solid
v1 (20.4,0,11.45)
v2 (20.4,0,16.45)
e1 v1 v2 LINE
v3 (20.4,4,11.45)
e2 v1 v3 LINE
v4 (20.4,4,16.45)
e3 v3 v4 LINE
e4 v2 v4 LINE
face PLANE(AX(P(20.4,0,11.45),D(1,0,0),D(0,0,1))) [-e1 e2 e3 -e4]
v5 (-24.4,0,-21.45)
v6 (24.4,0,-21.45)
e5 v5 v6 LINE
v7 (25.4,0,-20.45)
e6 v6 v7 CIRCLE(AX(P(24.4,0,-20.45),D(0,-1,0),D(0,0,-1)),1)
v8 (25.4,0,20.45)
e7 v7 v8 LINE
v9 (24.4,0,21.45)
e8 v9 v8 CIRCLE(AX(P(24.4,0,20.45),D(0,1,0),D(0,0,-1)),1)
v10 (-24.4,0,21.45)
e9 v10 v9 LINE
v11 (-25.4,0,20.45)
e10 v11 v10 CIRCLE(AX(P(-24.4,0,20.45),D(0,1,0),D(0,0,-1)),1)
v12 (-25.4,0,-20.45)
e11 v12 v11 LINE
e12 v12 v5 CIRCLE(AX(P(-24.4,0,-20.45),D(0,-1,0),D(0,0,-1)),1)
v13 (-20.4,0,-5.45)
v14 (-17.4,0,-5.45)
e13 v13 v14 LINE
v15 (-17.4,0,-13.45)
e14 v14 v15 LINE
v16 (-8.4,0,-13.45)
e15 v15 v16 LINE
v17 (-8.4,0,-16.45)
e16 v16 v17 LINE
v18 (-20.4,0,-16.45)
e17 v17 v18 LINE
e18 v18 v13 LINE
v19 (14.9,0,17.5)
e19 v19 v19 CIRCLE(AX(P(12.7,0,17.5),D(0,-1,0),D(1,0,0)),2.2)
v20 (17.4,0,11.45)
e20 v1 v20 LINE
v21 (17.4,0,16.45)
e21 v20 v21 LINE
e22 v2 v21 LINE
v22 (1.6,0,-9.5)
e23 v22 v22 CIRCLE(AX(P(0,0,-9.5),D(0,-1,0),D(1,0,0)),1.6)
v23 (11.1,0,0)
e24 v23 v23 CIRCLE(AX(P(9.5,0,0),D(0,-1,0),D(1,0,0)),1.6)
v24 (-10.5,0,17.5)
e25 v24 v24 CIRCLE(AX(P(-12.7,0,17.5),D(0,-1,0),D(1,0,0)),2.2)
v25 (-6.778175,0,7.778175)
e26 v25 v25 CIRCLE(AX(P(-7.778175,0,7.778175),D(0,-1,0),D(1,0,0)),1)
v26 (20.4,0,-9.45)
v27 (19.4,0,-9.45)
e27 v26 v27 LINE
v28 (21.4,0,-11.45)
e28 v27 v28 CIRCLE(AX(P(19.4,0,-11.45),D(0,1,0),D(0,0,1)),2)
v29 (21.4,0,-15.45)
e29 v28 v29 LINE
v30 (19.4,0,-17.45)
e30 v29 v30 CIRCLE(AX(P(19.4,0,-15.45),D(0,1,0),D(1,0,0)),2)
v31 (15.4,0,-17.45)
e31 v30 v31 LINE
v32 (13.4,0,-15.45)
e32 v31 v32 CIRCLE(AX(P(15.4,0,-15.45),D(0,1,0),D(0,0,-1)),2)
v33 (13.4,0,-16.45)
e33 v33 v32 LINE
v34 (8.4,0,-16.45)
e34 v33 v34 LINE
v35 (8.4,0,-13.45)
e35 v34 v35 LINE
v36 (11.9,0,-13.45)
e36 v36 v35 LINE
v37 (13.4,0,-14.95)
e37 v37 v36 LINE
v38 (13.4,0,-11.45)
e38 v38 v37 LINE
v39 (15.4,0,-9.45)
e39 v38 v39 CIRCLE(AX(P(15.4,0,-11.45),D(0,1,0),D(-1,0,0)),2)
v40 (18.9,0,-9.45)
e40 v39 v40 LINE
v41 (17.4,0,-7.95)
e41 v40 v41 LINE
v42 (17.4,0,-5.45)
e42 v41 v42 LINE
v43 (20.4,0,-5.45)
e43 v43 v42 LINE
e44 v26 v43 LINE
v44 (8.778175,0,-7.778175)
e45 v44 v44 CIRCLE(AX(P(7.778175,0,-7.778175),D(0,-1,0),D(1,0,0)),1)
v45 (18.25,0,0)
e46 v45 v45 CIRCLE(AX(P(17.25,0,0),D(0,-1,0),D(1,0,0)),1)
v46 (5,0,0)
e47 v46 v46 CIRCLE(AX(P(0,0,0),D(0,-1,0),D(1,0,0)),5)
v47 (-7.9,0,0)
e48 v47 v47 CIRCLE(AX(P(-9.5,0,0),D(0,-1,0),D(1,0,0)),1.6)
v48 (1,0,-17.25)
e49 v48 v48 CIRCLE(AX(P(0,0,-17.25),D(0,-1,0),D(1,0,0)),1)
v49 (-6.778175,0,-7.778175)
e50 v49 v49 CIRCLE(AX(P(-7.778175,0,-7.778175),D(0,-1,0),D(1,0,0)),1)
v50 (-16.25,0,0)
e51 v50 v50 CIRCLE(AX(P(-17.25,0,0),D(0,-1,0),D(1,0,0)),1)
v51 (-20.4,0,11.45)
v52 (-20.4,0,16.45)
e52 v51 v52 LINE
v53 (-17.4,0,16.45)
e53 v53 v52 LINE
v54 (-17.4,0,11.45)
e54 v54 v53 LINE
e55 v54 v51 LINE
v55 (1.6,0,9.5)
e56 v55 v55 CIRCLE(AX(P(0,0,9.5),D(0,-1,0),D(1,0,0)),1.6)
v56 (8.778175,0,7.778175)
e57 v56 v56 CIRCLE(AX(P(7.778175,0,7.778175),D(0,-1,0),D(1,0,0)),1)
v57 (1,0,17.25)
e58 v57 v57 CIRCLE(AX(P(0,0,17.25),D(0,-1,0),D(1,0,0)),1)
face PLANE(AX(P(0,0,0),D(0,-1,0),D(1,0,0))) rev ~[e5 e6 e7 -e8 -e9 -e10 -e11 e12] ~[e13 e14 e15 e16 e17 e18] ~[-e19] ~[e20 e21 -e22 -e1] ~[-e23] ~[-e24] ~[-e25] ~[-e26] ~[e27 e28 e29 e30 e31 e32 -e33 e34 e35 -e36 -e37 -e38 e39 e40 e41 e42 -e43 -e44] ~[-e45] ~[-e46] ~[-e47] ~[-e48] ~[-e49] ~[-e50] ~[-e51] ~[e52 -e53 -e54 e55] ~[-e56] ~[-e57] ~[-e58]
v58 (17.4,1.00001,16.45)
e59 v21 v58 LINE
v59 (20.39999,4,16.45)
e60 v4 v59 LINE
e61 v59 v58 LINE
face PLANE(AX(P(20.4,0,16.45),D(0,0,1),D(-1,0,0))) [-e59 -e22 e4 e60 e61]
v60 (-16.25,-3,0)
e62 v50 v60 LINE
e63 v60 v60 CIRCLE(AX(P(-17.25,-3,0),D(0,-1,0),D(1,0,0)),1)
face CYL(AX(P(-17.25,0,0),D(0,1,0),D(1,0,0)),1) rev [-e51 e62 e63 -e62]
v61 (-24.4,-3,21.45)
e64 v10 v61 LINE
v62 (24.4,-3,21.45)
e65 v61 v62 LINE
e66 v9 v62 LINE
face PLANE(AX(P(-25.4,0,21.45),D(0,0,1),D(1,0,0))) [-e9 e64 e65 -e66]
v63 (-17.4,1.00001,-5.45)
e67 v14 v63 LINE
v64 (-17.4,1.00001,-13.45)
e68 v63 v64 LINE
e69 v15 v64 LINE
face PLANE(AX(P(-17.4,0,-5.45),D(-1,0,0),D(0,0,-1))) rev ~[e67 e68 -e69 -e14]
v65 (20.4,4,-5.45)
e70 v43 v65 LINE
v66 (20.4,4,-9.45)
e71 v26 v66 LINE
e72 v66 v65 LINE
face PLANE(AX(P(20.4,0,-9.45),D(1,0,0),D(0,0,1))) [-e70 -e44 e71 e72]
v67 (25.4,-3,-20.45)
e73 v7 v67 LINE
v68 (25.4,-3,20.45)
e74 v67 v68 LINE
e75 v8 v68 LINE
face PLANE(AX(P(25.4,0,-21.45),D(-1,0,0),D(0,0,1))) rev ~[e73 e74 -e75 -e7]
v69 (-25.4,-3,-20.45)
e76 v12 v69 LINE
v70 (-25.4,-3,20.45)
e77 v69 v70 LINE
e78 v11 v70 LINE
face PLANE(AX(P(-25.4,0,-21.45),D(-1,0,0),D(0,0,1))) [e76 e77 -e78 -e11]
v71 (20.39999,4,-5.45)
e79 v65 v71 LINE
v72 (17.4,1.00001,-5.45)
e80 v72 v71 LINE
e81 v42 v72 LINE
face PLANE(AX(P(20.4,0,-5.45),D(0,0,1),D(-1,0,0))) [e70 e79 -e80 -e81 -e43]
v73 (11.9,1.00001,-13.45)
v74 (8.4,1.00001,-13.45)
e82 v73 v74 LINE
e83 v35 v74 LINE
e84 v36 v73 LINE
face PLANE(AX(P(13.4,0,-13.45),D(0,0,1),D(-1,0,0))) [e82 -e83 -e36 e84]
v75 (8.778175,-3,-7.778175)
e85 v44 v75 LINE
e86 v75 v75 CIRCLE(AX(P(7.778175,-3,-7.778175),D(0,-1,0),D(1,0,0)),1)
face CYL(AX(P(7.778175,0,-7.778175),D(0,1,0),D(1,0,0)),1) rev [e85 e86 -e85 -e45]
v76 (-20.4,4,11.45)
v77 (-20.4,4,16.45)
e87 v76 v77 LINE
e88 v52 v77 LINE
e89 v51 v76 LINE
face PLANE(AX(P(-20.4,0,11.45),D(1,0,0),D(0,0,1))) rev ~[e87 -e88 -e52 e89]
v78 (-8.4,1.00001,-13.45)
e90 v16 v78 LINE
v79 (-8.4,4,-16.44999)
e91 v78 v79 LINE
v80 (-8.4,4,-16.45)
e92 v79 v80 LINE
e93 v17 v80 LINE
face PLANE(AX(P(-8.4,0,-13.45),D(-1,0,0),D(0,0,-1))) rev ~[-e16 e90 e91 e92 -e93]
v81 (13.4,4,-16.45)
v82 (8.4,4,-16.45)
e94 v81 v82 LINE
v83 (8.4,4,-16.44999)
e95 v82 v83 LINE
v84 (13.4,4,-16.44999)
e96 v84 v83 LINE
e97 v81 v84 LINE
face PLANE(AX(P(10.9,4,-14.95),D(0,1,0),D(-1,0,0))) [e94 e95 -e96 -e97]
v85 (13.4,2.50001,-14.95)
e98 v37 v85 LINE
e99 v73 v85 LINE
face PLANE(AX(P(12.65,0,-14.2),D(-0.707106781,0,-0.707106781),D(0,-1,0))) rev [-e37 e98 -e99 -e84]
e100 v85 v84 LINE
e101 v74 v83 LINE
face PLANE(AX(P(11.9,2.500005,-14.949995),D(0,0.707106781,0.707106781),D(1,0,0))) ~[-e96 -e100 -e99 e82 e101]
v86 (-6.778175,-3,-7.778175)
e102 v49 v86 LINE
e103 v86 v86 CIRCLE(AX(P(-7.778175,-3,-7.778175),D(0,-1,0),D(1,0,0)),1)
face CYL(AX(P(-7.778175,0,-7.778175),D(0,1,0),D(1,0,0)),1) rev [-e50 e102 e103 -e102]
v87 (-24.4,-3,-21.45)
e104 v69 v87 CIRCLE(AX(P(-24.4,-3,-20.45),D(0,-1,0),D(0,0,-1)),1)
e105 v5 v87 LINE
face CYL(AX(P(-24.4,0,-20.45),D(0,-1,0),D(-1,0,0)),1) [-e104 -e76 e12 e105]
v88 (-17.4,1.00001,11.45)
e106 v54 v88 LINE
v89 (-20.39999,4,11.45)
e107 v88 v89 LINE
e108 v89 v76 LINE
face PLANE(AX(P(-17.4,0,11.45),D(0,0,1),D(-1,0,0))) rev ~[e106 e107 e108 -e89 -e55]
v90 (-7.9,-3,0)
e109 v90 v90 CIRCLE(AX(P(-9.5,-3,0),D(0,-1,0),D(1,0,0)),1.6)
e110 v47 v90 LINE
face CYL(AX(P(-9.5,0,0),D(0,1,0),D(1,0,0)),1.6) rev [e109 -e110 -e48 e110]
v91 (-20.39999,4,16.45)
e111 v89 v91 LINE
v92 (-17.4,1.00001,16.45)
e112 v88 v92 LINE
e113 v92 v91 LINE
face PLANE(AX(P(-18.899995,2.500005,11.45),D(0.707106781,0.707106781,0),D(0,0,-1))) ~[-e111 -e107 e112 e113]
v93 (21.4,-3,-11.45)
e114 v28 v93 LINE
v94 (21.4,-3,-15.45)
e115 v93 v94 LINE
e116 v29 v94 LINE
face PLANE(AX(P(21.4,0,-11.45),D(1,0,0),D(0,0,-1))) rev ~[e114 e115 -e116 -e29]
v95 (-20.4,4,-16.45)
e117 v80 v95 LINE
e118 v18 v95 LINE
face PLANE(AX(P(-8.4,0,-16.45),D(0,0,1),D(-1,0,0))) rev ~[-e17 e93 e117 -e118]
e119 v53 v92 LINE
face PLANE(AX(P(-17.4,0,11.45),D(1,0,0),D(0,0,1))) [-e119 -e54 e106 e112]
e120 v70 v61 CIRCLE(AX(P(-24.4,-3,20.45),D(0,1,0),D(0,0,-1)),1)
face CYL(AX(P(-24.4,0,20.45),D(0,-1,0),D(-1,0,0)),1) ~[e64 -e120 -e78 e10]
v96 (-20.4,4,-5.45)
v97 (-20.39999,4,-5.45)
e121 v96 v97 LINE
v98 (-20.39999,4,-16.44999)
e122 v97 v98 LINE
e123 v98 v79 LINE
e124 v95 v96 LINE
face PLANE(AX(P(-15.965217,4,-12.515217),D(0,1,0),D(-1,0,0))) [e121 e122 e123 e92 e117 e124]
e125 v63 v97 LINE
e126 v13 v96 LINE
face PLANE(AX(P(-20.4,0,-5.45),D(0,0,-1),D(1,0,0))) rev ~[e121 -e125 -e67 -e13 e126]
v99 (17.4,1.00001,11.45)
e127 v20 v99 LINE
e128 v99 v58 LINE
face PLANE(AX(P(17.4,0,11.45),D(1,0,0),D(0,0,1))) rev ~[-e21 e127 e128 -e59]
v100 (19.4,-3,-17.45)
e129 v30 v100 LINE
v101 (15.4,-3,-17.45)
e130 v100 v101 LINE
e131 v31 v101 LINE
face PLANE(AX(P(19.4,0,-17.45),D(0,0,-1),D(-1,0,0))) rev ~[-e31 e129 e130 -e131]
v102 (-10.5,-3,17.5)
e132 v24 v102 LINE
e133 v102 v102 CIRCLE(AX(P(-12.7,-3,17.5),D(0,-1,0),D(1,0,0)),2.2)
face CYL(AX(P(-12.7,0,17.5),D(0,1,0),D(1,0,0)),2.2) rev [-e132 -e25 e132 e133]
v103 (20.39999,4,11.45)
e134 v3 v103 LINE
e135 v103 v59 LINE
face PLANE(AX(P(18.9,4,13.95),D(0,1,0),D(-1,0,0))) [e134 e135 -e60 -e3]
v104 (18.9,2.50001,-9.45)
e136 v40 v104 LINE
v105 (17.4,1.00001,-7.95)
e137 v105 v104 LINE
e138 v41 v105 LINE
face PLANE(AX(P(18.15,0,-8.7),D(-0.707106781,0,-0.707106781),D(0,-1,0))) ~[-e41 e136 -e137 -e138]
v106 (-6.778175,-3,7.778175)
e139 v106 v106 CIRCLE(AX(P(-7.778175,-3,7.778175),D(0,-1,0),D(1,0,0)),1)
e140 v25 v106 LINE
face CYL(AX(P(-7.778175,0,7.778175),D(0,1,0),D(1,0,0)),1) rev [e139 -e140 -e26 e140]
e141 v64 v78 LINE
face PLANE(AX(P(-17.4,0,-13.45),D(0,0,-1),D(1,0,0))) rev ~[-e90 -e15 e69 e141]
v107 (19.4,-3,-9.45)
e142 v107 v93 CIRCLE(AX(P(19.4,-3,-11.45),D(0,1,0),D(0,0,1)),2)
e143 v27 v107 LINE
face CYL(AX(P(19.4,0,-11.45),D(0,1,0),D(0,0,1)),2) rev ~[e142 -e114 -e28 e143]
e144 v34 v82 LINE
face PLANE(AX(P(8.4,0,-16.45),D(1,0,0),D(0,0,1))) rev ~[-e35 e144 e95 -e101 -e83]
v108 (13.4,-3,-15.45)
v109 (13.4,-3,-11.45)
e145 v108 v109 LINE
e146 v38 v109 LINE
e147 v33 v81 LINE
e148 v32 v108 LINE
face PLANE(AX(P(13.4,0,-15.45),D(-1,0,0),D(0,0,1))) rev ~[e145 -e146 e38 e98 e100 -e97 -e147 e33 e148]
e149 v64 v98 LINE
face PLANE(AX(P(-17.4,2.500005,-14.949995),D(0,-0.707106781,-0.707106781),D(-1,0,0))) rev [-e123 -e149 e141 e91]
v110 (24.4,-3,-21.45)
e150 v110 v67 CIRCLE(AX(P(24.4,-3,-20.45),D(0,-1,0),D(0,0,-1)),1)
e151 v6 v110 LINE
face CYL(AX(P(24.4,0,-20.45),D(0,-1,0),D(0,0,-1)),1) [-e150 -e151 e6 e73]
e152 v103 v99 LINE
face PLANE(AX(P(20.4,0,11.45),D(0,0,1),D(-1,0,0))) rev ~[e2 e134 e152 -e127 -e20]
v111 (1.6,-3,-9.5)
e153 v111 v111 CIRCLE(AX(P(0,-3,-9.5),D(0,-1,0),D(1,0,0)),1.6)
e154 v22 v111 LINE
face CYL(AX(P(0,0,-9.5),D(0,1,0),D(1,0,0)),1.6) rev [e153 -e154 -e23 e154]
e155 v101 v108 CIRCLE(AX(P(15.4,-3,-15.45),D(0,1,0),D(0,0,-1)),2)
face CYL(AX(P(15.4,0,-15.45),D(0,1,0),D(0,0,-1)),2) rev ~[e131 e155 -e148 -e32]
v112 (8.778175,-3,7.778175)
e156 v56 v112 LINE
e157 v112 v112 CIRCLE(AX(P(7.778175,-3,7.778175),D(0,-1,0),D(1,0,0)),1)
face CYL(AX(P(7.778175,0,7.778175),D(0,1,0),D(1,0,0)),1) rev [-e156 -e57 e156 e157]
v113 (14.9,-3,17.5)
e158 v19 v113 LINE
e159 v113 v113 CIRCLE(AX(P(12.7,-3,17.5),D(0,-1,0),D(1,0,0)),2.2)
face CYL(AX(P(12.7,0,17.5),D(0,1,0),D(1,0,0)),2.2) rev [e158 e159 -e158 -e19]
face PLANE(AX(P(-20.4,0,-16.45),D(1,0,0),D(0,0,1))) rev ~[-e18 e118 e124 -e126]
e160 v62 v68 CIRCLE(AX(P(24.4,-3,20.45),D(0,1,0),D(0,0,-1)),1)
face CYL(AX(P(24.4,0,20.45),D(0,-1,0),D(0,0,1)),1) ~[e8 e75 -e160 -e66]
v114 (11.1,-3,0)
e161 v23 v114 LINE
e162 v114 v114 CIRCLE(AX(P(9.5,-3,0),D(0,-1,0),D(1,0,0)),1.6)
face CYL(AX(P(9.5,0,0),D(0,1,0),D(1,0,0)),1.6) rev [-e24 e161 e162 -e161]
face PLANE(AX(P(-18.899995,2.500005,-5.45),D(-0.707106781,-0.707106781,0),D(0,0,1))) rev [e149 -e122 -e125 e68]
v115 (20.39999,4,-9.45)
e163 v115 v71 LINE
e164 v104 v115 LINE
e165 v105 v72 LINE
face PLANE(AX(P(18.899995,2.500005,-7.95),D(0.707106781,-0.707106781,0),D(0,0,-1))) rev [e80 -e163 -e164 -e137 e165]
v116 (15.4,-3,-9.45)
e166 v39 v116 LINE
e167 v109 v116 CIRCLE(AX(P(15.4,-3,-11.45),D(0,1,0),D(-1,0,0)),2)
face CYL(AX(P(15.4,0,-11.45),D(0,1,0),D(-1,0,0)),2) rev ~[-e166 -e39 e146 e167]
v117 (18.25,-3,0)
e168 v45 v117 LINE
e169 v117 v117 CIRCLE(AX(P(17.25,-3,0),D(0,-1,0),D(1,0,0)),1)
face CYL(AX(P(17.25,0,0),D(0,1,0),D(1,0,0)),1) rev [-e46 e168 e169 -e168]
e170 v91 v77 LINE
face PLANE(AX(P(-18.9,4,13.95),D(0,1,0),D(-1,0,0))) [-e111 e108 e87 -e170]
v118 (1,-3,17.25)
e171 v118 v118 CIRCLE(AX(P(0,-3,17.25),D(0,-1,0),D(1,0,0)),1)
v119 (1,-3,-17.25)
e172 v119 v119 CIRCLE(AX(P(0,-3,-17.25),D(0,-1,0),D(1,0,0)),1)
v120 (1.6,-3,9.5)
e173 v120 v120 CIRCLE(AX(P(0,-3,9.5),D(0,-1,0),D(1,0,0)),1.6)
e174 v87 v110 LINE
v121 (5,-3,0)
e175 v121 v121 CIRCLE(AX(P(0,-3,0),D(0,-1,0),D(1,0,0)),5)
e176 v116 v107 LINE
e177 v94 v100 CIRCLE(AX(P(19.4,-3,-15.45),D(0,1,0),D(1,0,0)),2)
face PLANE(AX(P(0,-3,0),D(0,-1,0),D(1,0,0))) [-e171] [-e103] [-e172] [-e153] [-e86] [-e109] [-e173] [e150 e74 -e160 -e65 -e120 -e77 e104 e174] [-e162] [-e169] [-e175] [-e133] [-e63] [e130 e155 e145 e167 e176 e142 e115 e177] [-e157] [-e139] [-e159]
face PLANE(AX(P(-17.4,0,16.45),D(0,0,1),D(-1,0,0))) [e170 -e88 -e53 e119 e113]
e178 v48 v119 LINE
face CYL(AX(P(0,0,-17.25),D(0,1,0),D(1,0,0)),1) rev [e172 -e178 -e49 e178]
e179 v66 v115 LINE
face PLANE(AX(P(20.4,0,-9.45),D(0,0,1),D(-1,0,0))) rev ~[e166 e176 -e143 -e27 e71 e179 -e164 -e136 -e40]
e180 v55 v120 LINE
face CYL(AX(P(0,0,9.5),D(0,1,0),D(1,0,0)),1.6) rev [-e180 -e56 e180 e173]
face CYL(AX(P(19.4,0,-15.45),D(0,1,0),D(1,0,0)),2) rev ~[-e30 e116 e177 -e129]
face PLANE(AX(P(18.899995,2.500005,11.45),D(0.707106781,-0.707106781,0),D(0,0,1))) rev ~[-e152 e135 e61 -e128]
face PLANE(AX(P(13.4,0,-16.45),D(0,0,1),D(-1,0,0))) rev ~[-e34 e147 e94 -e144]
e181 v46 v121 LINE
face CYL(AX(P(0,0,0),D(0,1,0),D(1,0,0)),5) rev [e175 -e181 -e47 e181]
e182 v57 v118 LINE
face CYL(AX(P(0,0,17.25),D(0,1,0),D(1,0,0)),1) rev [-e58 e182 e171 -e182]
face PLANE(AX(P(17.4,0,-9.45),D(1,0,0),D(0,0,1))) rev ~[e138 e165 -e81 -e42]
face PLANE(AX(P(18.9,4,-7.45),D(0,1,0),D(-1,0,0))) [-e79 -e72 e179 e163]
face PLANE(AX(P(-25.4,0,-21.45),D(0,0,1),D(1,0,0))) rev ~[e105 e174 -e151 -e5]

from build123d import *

# Parameters (mm, degrees)
F0_W     = 50.8
F0_H     = 42.9
F0_R     = 1
F0_R_2   = 1.6
F0_R_3   = 5
F0_R_4   = 2.2
F1_DEPTH = 3
F2_R     = 1
F3_W     = 3
F3_H     = 5
F3_H_2   = 4
F3_W_2   = 5
F3_H_3   = 3
F4_DEPTH = 4
F5_SIZE  = 1.5
F6_SIZE  = 2.99999
F7_SIZE  = 2.99999


# Not quite as in the source:
# - a fillet or chamfer is up to 0.001 mm smaller than in the source, because OpenCascade refuses the exact size


with BuildPart() as f1:
    # F0 (on Front) → F1 (new body)
    with BuildSketch(Plane.XZ):
        Rectangle(F0_W, F0_H)
        with Locations((0, -17.25)):
            Circle(F0_R, mode=Mode.SUBTRACT)
        with Locations((-7.7781745931, -7.7781745931)):
            Circle(F0_R, mode=Mode.SUBTRACT)
        with Locations((0, -9.5)):
            Circle(F0_R_2, mode=Mode.SUBTRACT)
        with BuildLine():
            ThreePointArc((21.4, -15.45), (20.8142135624, -16.8642135624), (19.4, -17.45))
            Line((19.4, -17.45), (15.4, -17.45))
            ThreePointArc((15.4, -17.45), (13.9857864376, -16.8642135624), (13.4, -15.45))
            Line((13.4, -15.45), (13.4, -11.45))
            ThreePointArc((13.4, -11.45), (13.9857864376, -10.0357864376), (15.4, -9.45))
            Line((15.4, -9.45), (19.4, -9.45))
            ThreePointArc((19.4, -9.45), (20.8142135624, -10.0357864376), (21.4, -11.45))
            Line((21.4, -11.45), (21.4, -15.45))
        make_face(mode=Mode.SUBTRACT)
        with Locations((7.7781745931, -7.7781745931)):
            Circle(F0_R, mode=Mode.SUBTRACT)
        with Locations((-17.25, 0)):
            Circle(F0_R, mode=Mode.SUBTRACT)
        with Locations((-9.5, 0)):
            Circle(F0_R_2, mode=Mode.SUBTRACT)
        Circle(F0_R_3, mode=Mode.SUBTRACT)
        with Locations((-7.7781745931, 7.7781745931)):
            Circle(F0_R, mode=Mode.SUBTRACT)
        with Locations((0, 9.5)):
            Circle(F0_R_2, mode=Mode.SUBTRACT)
        with Locations((-12.7, 17.5)):
            Circle(F0_R_4, mode=Mode.SUBTRACT)
        with Locations((0, 17.25)):
            Circle(F0_R, mode=Mode.SUBTRACT)
        with Locations((9.5, 0)):
            Circle(F0_R_2, mode=Mode.SUBTRACT)
        with Locations((7.7781745931, 7.7781745931)):
            Circle(F0_R, mode=Mode.SUBTRACT)
        with Locations((17.25, 0)):
            Circle(F0_R, mode=Mode.SUBTRACT)
        with Locations((12.7, 17.5)):
            Circle(F0_R_4, mode=Mode.SUBTRACT)
    extrude(amount=F1_DEPTH)

    # F2
    f2_edges = [f1.edges().sort_by_distance(p)[0] for p in [
        (25.4, -1.5, 21.45),
        (25.4, -1.5, -21.45),
        (-25.4, -1.5, -21.45),
        (-25.4, -1.5, 21.45),
    ]]
    fillet(f2_edges, radius=F2_R)

    # F3 (on face) → F4 (join)
    with BuildSketch(Plane(origin=(0, 0, 0), x_dir=(-1, 0, 0), z_dir=(0, 1, 0))):
        with Locations((-18.9, 13.95)):
            Rectangle(F3_W, F3_H)
        with Locations((-18.9, -7.45)):
            Rectangle(F3_W, F3_H_2)
        with Locations((18.9, 13.95)):
            Rectangle(F3_W, F3_H)
        Polygon((20.4, -16.45), (20.4, -5.45), (17.4, -5.45), (17.4, -13.45), (8.4, -13.45), (8.4, -16.45), align=None)
        with Locations((-10.9, -14.95)):
            Rectangle(F3_W_2, F3_H_3)
    extrude(amount=F4_DEPTH)

    # F5
    f5_edges = [f1.edges().sort_by_distance(p)[0] for p in [
        (13.4, 2, -13.45),
        (17.4, 2, -9.45),
    ]]
    chamfer(f5_edges, length=F5_SIZE)

    # F6 (size 3 in the source; OpenCascade refuses exactly that, so slightly less here)
    f6_edges = [f1.edges().sort_by_distance(p)[0] for p in [
        (17.4, 4, 13.95),
    ]]
    chamfer(f6_edges, length=F6_SIZE)

    # F7 (size 3 in the source; OpenCascade refuses exactly that, so slightly less here)
    f7_edges = [f1.edges().sort_by_distance(p)[0] for p in [
        (-17.4, 4, 13.95),
        (-17.4, 4, -9.45),
        (-12.9, 4, -13.45),
        (10.15, 4, -13.45),
        (17.4, 4, -6.7),
    ]]
    chamfer(f7_edges, length=F7_SIZE)


solid = f1.part
